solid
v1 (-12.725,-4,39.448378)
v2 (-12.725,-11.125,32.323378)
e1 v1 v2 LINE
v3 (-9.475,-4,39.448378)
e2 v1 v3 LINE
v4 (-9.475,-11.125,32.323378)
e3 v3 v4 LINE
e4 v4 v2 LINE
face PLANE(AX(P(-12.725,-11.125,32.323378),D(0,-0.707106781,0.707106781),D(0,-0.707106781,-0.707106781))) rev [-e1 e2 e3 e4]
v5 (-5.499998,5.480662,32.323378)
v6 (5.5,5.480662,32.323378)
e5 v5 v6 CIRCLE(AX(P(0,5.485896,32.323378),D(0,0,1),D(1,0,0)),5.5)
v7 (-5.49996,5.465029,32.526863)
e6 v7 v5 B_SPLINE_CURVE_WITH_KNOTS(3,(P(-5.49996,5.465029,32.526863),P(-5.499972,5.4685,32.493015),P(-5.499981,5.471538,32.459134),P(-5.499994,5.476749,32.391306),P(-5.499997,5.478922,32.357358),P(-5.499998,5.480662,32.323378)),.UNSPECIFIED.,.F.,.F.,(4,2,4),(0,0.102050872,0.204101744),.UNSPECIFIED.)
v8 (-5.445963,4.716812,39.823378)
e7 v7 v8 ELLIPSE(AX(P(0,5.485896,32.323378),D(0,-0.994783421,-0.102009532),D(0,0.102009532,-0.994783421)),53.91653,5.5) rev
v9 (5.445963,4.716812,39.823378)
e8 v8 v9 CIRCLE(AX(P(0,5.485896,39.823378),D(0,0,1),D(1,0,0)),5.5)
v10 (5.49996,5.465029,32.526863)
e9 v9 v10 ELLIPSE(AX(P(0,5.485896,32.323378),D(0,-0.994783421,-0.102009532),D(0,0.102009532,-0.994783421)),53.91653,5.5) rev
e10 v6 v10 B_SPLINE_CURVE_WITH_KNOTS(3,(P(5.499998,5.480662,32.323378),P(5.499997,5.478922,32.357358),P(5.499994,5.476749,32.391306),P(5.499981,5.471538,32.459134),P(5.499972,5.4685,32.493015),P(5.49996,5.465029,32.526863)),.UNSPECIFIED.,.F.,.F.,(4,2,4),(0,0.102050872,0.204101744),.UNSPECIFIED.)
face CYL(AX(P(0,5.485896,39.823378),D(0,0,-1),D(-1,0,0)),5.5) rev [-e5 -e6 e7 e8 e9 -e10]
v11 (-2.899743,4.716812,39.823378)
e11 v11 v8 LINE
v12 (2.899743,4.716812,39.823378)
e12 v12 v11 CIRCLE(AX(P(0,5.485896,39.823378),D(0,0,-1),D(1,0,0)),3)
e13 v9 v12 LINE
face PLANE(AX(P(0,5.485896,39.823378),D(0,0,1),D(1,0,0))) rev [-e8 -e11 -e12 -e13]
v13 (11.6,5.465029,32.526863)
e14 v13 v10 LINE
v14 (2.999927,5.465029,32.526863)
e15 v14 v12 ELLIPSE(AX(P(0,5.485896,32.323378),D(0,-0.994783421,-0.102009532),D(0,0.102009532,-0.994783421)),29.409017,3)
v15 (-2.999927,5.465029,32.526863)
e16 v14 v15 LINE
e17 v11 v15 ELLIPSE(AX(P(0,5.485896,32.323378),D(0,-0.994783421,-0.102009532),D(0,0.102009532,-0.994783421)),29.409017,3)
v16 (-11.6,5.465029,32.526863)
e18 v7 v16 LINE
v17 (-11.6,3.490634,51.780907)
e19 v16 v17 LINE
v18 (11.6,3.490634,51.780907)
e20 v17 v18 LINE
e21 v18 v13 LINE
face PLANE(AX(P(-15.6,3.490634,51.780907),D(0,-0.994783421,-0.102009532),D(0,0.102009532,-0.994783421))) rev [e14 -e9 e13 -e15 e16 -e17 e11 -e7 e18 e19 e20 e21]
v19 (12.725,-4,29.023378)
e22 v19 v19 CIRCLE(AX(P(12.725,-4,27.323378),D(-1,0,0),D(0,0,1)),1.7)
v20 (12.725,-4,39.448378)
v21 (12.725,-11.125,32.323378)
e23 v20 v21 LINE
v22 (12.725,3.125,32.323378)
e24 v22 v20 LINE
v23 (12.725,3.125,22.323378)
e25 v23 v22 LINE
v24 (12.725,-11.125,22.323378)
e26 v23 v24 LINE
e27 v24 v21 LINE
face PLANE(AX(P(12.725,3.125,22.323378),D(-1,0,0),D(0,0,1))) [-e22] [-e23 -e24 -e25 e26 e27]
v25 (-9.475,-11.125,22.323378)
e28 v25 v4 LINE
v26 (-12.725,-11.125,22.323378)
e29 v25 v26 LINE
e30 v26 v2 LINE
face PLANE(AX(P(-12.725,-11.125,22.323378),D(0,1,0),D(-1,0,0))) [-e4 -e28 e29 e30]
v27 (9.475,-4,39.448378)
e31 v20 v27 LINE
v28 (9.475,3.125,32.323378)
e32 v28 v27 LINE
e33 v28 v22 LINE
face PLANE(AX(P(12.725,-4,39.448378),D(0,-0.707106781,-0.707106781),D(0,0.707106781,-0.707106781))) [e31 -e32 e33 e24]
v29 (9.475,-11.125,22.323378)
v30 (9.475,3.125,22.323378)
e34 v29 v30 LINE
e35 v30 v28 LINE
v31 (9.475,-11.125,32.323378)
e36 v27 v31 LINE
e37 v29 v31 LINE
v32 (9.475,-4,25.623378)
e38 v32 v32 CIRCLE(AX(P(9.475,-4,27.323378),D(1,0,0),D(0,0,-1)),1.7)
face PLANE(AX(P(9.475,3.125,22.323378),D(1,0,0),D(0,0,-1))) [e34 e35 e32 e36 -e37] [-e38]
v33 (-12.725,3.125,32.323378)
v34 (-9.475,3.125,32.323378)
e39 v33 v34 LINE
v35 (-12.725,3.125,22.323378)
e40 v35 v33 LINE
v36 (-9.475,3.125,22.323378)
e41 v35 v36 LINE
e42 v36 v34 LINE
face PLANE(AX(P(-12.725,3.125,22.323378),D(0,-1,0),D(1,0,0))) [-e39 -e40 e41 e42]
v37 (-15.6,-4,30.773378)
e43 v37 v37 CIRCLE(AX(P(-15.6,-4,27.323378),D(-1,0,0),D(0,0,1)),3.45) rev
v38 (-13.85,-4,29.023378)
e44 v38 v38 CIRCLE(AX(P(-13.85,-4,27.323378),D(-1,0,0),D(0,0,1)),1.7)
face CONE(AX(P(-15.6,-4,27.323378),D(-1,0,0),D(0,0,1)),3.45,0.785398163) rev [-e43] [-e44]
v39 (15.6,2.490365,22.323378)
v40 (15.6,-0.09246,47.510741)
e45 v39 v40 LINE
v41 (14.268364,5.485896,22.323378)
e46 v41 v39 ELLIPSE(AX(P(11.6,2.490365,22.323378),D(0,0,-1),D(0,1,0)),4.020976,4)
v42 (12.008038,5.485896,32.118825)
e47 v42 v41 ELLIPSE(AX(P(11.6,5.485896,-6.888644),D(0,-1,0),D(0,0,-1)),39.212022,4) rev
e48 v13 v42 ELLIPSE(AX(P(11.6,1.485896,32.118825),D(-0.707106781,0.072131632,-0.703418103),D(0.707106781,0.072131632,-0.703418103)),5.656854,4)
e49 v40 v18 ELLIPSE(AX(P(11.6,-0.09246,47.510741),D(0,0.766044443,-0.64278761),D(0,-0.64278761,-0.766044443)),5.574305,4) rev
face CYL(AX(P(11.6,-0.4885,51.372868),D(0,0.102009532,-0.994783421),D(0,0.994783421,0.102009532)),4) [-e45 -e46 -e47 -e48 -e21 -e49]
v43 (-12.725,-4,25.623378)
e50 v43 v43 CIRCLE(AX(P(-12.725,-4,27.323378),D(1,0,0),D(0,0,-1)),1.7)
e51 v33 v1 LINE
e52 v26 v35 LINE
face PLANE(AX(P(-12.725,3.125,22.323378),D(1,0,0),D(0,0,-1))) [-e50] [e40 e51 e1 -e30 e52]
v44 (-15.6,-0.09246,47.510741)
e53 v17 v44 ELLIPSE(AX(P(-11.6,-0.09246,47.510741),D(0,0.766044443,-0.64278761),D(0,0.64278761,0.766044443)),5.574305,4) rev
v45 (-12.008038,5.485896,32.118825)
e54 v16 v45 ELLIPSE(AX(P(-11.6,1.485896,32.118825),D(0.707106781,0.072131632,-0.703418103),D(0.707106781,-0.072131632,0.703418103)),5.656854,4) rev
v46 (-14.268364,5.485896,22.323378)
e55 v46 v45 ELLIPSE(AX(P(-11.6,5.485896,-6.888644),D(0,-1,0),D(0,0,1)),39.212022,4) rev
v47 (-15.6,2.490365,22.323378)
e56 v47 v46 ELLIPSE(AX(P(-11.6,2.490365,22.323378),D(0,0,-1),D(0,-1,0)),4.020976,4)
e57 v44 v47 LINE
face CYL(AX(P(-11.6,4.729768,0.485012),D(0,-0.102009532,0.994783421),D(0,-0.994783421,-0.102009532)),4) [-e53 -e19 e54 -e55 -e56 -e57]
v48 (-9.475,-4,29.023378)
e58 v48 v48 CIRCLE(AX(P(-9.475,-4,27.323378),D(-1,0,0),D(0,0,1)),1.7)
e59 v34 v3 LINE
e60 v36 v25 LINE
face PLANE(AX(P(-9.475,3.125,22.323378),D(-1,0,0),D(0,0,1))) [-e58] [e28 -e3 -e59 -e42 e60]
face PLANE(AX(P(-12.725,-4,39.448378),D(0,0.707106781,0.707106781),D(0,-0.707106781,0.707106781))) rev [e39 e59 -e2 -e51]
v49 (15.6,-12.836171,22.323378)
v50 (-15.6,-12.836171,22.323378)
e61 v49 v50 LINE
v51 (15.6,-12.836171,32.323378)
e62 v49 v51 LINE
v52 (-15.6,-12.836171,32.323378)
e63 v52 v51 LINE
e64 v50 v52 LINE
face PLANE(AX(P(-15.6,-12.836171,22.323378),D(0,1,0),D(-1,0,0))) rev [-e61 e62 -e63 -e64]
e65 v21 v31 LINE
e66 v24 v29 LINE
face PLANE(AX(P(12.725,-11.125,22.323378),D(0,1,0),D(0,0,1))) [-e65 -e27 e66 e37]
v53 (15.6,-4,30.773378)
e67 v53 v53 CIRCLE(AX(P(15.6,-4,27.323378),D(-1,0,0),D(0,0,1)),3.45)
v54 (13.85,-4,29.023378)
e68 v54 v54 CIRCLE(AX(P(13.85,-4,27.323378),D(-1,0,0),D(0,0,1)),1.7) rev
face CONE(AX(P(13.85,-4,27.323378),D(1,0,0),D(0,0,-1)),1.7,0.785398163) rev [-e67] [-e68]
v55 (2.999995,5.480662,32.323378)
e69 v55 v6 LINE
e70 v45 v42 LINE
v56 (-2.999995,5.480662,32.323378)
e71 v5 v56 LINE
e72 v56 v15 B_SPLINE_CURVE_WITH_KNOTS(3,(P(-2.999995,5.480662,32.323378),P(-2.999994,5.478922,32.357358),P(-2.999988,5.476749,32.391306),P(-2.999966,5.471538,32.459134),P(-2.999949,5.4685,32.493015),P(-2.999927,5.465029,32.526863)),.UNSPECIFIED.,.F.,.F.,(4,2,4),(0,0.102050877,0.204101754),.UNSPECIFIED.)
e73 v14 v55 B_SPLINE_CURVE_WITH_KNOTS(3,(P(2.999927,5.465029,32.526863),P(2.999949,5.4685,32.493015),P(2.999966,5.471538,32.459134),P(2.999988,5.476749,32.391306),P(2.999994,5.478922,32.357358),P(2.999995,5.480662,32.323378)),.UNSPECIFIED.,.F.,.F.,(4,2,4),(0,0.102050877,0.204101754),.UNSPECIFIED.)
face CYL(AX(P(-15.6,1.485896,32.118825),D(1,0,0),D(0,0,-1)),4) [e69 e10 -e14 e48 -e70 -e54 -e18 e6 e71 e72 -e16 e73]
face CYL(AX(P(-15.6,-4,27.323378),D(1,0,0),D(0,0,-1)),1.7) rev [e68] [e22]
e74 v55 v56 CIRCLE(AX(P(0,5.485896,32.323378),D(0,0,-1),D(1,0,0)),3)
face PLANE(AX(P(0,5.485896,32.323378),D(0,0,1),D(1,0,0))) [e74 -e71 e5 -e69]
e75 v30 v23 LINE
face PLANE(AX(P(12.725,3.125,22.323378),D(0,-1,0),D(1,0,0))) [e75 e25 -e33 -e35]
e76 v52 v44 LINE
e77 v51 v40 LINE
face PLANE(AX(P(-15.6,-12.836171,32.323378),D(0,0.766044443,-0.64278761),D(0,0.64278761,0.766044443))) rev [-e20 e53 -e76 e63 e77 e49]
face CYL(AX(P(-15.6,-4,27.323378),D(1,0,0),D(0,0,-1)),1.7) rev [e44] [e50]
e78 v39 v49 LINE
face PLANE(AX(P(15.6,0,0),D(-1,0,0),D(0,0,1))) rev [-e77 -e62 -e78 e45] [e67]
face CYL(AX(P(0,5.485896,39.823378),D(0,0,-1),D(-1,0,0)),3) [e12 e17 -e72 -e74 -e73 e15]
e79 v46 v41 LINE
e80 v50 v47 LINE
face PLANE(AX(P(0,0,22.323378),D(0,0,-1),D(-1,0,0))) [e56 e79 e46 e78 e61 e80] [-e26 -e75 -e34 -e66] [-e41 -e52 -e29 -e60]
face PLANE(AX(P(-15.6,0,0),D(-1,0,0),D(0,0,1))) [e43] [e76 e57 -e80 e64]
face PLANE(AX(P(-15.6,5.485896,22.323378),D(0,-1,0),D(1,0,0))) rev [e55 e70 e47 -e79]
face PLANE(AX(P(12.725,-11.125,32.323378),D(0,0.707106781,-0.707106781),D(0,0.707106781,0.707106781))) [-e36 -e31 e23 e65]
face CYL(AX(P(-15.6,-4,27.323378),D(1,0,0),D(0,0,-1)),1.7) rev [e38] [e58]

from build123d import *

# Parameters (mm, degrees)
BOSS_EXTRUDE1_DEPTH = 31.2
BOSS_EXTRUDE2_DEPTH = 10
CUT_EXTRUDE1_START  = -31.2
SKETCH6_R           = 1.6999999999999995
CUT_EXTRUDE1_DEPTH  = 31.2
CUT_EXTRUDE2_DEPTH  = 3.25
CHAMFER1_SIZE       = 1.75
FILLET2_R           = 4
CUT_EXTRUDE3_DEPTH  = 7.5


with BuildPart() as part:
    # Sketch4 → Boss-Extrude1 (new body)
    with BuildSketch(Plane(origin=(15.600000000000225, 5.91e-15, 1.0893e-13), x_dir=(3.8e-16, -1, 0), z_dir=(-1, -3.8e-16, -6.98e-15))):
        Polygon((12.836171405416206, 32.32337770791894), (-3.4906338806220005, 51.78090656314089), (-5.485895724995086, 32.32337770791894), align=None)
    extrude(amount=BOSS_EXTRUDE1_DEPTH)

    # Sketch5 → Boss-Extrude2 (add)
    with BuildSketch(Plane(origin=(-2.2571e-13, 0, 32.323377707918944), x_dir=(-1, 0, -6.98e-15), z_dir=(6.98e-15, 0, -1))):
        Polygon((-15.600000000000223, 5.485895724995093), (-15.60000000000023, -12.8361714054162), (15.599999999999769, -12.836171405416213), (15.599999999999776, 5.485895724995081), align=None)
        Polygon((-12.725000000000225, -11.125000000000004), (-9.475000000000225, -11.125000000000004), (-9.475000000000227, 3.1250000000000013), (-12.725000000000227, 3.125000000000001), align=None, mode=Mode.SUBTRACT)
        Polygon((12.724999999999774, -11.125000000000002), (9.474999999999774, -11.125), (9.474999999999772, 3.1250000000000018), (12.724999999999772, 3.1250000000000027), align=None, mode=Mode.SUBTRACT)
    extrude(amount=BOSS_EXTRUDE2_DEPTH)

    # Sketch6 → Cut-Extrude1 (cut)
    with BuildSketch(Plane(origin=(15.600000000000225, 5.91e-15, 1.0909e-13), x_dir=(6.99e-15, 0, -1), z_dir=(1, 3.8e-16, 6.99e-15)).offset(CUT_EXTRUDE1_START)):
        with Locations((-27.32337770791874, -4.000000000000007)):
            Circle(SKETCH6_R)
    extrude(amount=CUT_EXTRUDE1_DEPTH, mode=Mode.SUBTRACT)

    # Sketch8 → Cut-Extrude2 (cut)
    with BuildSketch(Plane(origin=(9.475000000000227, -1.15e-15, 6.616e-14), x_dir=(6.98e-15, 0, -1), z_dir=(1, 0, 6.98e-15))):
        Polygon((-32.323377707918944, -11.125000000000002), (-32.323377707918944, 3.1250000000000027), (-39.44837770791897, -3.999999999999999), align=None)
    cut_extrude2 = extrude(amount=CUT_EXTRUDE2_DEPTH, mode=Mode.SUBTRACT)

    # Chamfer1
    chamfer1_edges = [part.edges().sort_by_distance(p)[0] for p in [
        (-15.599999999999975, -4.000000000000013, 29.02337770791863),
        (15.600000000000025, -4.000000000000001, 29.02337770791885),
    ]]
    chamfer(chamfer1_edges, length=CHAMFER1_SIZE)

    # Mirror1: Cut-Extrude2 across plane
    add(cut_extrude2.mirror(Plane(origin=(0, 0, 0), x_dir=(0, 0, 1), z_dir=(1, 0, 0))), mode=Mode.SUBTRACT)

    # Fillet2
    # the kernel refuses this fillet: 4 mm, written as the material it takes off along each edge
    with BuildSketch(Plane(origin=(-15.600000000000204, 2.4705385648813603, 61.72874077701889), x_dir=(1, 3.9e-16, 6.98e-15), z_dir=(6.907902673272719e-15, 0.10200953157406341, -0.9947834213878116))) as fillet2_piece_1:
        with BuildLine():
            CenterArc((FILLET2_R, FILLET2_R), FILLET2_R, 180, 90)
            Line((2.72e-15, FILLET2_R), (0, 0))
            Line((0, 0), (FILLET2_R, 0))
        make_face()
    extrude(amount=39.55956285246186, mode=Mode.SUBTRACT)
    with BuildSketch(Plane(origin=(16.11138148873873, 5.485895724995093, 32.323377707919036), x_dir=(-6.90790267327272e-15, -0.10200953157406191, 0.9947834213878117), z_dir=(-1, -3.8e-16, -6.98e-15))) as fillet2_piece_2:
        with BuildLine():
            CenterArc((FILLET2_R * 0.0511381488739, -FILLET2_R), FILLET2_R, 89.9999999999999, 5.854900023063593)
            Line((-FILLET2_R * 0.0508713827002, -FILLET2_R * 0.00521657861219), (0, 0))
            Line((0, 0), (FILLET2_R * 0.0511381488739, 0))
        make_face()
    extrude(amount=32.22276297747746, mode=Mode.SUBTRACT)
    with BuildSketch(Plane(origin=(15.599999999999794, 2.470538564881372, 61.72874077701911), x_dir=(0, -0.9947834213878115, -0.1020095315740634), z_dir=(6.907902673272719e-15, 0.10200953157406341, -0.9947834213878116))) as fillet2_piece_3:
        with BuildLine():
            CenterArc((FILLET2_R, FILLET2_R), FILLET2_R, 180, 90)
            Line((6.7e-16, FILLET2_R), (0, 0))
            Line((0, 0), (FILLET2_R, 0))
        make_face()
    extrude(amount=39.559562852461866, mode=Mode.SUBTRACT)

    # Sketch9 → Cut-Extrude3 (cut)
    with BuildSketch(Plane.XY.offset(32.32337770791894)):
        with BuildLine():
            Line((3, 5.485895724995084), (5.5, 5.485895724995082))
            ThreePointArc((5.5, 5.485895724995082), (-1.4e-15, -0.01410427500491185), (-5.5, 5.485895724995082))
            Line((-5.5, 5.485895724995082), (-3, 5.485895724995084))
            ThreePointArc((-3, 5.485895724995084), (-1.55e-15, 2.485895724995088), (3, 5.485895724995084))
        make_face()
    extrude(amount=CUT_EXTRUDE3_DEPTH, mode=Mode.SUBTRACT)


solid = part.part
